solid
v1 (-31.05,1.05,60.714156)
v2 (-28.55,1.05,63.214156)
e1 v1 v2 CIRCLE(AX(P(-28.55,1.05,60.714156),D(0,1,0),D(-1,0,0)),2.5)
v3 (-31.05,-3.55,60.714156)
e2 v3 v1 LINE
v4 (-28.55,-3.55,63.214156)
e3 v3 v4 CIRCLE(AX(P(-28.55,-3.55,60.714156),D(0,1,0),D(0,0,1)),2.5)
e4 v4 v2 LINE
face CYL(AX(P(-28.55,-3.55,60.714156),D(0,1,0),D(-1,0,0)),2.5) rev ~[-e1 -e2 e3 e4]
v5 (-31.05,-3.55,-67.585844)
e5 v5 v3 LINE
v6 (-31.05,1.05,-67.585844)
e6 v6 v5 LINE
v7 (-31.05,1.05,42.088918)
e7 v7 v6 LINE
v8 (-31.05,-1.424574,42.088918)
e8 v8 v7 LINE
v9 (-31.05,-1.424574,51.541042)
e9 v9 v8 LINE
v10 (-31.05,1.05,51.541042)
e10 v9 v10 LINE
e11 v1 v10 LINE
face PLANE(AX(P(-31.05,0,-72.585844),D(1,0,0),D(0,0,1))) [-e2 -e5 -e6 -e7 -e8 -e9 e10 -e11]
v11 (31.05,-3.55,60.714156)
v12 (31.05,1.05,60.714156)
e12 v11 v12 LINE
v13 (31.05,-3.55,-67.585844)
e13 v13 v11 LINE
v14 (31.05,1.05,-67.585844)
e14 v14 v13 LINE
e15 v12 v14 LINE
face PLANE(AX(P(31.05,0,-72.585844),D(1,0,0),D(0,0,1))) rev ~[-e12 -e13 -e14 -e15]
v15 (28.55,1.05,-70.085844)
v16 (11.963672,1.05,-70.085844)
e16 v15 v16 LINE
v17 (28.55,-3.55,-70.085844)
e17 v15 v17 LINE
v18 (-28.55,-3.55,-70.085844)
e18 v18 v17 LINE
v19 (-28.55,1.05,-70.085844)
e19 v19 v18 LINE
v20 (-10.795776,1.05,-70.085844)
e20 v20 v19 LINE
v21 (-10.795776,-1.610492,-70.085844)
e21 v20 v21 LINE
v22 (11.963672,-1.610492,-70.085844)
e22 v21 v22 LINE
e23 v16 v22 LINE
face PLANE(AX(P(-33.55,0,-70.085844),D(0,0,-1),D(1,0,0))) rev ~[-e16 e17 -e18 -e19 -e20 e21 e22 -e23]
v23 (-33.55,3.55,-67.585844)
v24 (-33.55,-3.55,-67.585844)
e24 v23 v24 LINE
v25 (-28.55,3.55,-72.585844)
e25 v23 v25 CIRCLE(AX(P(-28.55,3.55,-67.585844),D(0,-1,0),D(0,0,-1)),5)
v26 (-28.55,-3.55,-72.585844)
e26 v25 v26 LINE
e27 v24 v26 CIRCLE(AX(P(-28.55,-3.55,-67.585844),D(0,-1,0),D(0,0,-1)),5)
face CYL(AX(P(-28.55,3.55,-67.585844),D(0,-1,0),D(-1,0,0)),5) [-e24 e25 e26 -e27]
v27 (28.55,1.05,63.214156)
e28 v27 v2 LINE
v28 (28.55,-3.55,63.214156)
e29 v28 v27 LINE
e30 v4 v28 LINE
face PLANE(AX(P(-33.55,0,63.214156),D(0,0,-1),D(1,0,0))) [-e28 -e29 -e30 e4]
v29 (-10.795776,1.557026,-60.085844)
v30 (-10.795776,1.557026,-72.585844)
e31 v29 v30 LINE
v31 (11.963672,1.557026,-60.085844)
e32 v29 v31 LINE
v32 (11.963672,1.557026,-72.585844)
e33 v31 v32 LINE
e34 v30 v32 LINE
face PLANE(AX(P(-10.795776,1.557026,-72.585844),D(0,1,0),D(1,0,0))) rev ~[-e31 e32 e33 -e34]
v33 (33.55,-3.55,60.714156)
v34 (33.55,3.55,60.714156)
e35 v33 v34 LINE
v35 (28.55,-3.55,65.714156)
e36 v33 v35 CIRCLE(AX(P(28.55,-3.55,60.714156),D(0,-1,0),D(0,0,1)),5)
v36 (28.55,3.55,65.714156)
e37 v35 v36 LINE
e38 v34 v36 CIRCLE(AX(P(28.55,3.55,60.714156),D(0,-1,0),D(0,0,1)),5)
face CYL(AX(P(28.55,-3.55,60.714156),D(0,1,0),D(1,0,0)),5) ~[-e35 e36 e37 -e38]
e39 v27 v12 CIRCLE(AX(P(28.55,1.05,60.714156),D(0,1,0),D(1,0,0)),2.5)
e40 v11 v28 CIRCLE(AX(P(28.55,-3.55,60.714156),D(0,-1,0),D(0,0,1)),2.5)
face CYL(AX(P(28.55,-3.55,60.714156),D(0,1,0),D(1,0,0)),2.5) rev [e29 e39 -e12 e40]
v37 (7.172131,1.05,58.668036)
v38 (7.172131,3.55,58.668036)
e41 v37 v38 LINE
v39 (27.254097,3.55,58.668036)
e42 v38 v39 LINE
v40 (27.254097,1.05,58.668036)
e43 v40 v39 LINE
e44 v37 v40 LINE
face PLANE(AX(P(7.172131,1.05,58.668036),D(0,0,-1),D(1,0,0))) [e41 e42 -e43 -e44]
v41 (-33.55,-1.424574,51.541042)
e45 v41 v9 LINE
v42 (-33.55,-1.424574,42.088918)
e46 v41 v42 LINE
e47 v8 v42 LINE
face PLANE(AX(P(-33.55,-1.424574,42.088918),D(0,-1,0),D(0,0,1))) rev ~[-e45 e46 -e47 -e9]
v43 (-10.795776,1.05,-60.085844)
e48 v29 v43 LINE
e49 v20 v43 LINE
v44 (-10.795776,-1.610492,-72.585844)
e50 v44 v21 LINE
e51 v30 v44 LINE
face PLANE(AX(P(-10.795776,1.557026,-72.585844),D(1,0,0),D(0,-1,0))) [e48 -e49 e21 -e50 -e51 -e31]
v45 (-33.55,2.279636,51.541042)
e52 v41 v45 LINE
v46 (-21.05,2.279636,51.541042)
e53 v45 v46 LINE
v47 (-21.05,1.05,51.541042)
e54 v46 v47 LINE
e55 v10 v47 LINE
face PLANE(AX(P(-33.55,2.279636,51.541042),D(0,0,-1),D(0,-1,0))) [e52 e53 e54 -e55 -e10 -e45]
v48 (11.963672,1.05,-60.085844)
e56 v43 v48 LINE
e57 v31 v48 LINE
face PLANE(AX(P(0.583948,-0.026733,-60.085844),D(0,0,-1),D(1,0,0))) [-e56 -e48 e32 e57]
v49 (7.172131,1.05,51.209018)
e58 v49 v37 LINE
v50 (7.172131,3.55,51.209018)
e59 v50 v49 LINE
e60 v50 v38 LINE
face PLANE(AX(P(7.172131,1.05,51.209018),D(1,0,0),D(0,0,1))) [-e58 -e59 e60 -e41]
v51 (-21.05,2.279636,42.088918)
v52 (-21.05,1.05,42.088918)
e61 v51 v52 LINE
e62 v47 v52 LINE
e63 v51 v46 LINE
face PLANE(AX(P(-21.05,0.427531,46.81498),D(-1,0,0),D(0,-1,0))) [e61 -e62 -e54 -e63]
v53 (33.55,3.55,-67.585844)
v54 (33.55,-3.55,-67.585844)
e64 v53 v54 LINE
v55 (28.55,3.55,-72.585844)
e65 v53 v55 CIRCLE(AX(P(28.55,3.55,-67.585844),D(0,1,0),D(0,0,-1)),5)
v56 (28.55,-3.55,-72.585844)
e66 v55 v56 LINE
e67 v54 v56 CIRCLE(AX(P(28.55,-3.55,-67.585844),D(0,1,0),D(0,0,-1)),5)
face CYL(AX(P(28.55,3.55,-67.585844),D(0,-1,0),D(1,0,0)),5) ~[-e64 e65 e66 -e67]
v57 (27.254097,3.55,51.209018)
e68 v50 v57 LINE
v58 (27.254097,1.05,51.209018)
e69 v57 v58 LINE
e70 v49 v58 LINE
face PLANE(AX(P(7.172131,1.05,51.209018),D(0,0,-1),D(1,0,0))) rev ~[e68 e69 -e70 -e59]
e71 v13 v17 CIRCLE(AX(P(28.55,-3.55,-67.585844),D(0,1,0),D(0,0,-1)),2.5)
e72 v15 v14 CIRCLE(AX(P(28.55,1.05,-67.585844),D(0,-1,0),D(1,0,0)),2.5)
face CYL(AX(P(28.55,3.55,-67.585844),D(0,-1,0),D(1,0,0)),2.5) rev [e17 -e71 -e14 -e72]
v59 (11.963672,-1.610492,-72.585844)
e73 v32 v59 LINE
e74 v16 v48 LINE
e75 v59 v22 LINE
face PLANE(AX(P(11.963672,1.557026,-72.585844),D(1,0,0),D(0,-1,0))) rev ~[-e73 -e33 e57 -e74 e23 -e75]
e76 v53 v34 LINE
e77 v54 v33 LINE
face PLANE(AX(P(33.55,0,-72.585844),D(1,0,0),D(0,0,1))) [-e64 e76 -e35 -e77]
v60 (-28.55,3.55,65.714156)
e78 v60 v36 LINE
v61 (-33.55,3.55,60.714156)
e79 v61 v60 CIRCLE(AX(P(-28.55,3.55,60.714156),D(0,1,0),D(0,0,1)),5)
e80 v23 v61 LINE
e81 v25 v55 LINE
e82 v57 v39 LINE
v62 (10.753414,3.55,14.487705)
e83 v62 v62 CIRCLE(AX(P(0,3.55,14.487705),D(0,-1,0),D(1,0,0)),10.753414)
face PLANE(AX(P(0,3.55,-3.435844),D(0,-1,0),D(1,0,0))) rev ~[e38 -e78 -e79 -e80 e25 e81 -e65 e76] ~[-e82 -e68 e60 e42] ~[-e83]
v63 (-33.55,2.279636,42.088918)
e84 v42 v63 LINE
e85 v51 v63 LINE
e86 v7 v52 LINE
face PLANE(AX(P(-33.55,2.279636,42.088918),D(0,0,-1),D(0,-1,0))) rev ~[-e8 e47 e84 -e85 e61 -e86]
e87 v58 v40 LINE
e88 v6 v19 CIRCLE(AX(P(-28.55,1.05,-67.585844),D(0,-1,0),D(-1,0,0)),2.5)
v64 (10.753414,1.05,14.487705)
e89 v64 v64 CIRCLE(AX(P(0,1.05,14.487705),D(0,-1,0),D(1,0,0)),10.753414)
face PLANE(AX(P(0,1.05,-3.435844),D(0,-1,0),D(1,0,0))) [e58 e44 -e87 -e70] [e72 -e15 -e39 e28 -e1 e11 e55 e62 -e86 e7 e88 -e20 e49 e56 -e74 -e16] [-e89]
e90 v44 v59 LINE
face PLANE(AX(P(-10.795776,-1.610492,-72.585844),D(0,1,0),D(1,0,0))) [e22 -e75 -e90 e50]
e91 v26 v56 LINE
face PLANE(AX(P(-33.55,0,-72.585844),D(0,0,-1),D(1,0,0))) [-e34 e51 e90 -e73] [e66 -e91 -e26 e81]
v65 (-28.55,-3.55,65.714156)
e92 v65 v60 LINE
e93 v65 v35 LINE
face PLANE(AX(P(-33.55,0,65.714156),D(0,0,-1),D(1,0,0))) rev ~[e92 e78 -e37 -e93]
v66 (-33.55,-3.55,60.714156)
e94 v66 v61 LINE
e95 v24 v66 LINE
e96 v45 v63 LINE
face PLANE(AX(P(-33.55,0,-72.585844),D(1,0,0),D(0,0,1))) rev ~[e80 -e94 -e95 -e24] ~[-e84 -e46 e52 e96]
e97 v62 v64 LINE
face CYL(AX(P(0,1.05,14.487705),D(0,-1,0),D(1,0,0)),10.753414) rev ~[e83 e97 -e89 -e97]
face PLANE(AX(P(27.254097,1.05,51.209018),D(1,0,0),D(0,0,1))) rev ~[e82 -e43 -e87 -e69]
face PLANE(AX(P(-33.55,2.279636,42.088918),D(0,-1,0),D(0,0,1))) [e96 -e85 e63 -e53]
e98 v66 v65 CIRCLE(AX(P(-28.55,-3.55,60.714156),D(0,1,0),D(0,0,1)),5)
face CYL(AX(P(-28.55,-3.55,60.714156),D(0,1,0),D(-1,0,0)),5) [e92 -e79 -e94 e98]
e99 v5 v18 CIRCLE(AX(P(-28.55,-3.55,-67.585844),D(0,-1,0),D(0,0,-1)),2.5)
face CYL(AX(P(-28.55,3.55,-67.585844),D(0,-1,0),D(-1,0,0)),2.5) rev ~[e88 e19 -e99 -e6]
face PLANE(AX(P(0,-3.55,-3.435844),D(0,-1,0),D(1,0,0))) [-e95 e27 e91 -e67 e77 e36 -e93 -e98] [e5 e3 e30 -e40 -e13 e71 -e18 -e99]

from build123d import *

# Parameters (mm, degrees)
F0_W      = 67.1
F0_H      = 138.3
F1_DEPTH  = 3.55
F2_R      = 5
F3_T      = -2.5
F4_W      = 20.0819657184
F4_H      = 7.4590183794
F5_DEPTH  = 12.5
F7_R      = 10.7534144168
F8_DEPTH  = 12.5
F6_W      = 22.7594478056
F6_H      = 3.1675179489
F9_DEPTH  = 12.5
F10_W     = 3.7042096956
F10_H     = 9.4521231949
F11_DEPTH = 12.5


with BuildPart() as f1:
    # F0 (on Front) → F1 (new body, symmetric)
    with BuildSketch(Plane.XZ):
        with Locations((0, -3.435843619)):
            Rectangle(F0_W, F0_H)
    extrude(amount=F1_DEPTH, both=True)

    # F2
    f2_edges = [f1.edges().sort_by_distance(p)[0] for p in [
        (33.55, 0, 65.714156),
        (33.55, 0, -72.585844),
        (-33.55, 0, -72.585844),
        (-33.55, 0, 65.714156),
    ]]
    fillet(f2_edges, radius=F2_R)

    # F3
    f3_openings = [f1.faces().sort_by_distance(p)[0] for p in [
        (0, -3.55, -3.435844),
    ]]
    offset(amount=F3_T, openings=f3_openings)

    # F4 (on face) → F5 (cut, symmetric)
    with BuildSketch(Plane.XZ.offset(-1.05)):
        with Locations((17.2131143045, 54.9385268241)):
            Rectangle(F4_W, F4_H)
    extrude(amount=F5_DEPTH, both=True, mode=Mode.SUBTRACT)

    # F7 (on face) → F8 (cut, symmetric)
    with BuildSketch(Plane.XZ.offset(-1.05)):
        with Locations((0, 14.4877051935)):
            Circle(F7_R)
    extrude(amount=F8_DEPTH, both=True, mode=Mode.SUBTRACT)

    # F6 (on face) → F9 (cut, symmetric)
    with BuildSketch(Plane(origin=(0, 0, -72.585843619), x_dir=(1, 0, 0), z_dir=(0, 0, -1))):
        with Locations((0.5839481018, 0.0267331488)):
            Rectangle(F6_W, F6_H)
    extrude(amount=F9_DEPTH, both=True, mode=Mode.SUBTRACT)

    # F10 (on face) → F11 (cut, symmetric)
    with BuildSketch(Plane(origin=(-33.55, 0, 0), x_dir=(0, -1, 0), z_dir=(-1, 0, 0))):
        with Locations((-0.4275311367, 46.8149799854)):
            Rectangle(F10_W, F10_H)
    extrude(amount=F11_DEPTH, both=True, mode=Mode.SUBTRACT)


solid = f1.part
